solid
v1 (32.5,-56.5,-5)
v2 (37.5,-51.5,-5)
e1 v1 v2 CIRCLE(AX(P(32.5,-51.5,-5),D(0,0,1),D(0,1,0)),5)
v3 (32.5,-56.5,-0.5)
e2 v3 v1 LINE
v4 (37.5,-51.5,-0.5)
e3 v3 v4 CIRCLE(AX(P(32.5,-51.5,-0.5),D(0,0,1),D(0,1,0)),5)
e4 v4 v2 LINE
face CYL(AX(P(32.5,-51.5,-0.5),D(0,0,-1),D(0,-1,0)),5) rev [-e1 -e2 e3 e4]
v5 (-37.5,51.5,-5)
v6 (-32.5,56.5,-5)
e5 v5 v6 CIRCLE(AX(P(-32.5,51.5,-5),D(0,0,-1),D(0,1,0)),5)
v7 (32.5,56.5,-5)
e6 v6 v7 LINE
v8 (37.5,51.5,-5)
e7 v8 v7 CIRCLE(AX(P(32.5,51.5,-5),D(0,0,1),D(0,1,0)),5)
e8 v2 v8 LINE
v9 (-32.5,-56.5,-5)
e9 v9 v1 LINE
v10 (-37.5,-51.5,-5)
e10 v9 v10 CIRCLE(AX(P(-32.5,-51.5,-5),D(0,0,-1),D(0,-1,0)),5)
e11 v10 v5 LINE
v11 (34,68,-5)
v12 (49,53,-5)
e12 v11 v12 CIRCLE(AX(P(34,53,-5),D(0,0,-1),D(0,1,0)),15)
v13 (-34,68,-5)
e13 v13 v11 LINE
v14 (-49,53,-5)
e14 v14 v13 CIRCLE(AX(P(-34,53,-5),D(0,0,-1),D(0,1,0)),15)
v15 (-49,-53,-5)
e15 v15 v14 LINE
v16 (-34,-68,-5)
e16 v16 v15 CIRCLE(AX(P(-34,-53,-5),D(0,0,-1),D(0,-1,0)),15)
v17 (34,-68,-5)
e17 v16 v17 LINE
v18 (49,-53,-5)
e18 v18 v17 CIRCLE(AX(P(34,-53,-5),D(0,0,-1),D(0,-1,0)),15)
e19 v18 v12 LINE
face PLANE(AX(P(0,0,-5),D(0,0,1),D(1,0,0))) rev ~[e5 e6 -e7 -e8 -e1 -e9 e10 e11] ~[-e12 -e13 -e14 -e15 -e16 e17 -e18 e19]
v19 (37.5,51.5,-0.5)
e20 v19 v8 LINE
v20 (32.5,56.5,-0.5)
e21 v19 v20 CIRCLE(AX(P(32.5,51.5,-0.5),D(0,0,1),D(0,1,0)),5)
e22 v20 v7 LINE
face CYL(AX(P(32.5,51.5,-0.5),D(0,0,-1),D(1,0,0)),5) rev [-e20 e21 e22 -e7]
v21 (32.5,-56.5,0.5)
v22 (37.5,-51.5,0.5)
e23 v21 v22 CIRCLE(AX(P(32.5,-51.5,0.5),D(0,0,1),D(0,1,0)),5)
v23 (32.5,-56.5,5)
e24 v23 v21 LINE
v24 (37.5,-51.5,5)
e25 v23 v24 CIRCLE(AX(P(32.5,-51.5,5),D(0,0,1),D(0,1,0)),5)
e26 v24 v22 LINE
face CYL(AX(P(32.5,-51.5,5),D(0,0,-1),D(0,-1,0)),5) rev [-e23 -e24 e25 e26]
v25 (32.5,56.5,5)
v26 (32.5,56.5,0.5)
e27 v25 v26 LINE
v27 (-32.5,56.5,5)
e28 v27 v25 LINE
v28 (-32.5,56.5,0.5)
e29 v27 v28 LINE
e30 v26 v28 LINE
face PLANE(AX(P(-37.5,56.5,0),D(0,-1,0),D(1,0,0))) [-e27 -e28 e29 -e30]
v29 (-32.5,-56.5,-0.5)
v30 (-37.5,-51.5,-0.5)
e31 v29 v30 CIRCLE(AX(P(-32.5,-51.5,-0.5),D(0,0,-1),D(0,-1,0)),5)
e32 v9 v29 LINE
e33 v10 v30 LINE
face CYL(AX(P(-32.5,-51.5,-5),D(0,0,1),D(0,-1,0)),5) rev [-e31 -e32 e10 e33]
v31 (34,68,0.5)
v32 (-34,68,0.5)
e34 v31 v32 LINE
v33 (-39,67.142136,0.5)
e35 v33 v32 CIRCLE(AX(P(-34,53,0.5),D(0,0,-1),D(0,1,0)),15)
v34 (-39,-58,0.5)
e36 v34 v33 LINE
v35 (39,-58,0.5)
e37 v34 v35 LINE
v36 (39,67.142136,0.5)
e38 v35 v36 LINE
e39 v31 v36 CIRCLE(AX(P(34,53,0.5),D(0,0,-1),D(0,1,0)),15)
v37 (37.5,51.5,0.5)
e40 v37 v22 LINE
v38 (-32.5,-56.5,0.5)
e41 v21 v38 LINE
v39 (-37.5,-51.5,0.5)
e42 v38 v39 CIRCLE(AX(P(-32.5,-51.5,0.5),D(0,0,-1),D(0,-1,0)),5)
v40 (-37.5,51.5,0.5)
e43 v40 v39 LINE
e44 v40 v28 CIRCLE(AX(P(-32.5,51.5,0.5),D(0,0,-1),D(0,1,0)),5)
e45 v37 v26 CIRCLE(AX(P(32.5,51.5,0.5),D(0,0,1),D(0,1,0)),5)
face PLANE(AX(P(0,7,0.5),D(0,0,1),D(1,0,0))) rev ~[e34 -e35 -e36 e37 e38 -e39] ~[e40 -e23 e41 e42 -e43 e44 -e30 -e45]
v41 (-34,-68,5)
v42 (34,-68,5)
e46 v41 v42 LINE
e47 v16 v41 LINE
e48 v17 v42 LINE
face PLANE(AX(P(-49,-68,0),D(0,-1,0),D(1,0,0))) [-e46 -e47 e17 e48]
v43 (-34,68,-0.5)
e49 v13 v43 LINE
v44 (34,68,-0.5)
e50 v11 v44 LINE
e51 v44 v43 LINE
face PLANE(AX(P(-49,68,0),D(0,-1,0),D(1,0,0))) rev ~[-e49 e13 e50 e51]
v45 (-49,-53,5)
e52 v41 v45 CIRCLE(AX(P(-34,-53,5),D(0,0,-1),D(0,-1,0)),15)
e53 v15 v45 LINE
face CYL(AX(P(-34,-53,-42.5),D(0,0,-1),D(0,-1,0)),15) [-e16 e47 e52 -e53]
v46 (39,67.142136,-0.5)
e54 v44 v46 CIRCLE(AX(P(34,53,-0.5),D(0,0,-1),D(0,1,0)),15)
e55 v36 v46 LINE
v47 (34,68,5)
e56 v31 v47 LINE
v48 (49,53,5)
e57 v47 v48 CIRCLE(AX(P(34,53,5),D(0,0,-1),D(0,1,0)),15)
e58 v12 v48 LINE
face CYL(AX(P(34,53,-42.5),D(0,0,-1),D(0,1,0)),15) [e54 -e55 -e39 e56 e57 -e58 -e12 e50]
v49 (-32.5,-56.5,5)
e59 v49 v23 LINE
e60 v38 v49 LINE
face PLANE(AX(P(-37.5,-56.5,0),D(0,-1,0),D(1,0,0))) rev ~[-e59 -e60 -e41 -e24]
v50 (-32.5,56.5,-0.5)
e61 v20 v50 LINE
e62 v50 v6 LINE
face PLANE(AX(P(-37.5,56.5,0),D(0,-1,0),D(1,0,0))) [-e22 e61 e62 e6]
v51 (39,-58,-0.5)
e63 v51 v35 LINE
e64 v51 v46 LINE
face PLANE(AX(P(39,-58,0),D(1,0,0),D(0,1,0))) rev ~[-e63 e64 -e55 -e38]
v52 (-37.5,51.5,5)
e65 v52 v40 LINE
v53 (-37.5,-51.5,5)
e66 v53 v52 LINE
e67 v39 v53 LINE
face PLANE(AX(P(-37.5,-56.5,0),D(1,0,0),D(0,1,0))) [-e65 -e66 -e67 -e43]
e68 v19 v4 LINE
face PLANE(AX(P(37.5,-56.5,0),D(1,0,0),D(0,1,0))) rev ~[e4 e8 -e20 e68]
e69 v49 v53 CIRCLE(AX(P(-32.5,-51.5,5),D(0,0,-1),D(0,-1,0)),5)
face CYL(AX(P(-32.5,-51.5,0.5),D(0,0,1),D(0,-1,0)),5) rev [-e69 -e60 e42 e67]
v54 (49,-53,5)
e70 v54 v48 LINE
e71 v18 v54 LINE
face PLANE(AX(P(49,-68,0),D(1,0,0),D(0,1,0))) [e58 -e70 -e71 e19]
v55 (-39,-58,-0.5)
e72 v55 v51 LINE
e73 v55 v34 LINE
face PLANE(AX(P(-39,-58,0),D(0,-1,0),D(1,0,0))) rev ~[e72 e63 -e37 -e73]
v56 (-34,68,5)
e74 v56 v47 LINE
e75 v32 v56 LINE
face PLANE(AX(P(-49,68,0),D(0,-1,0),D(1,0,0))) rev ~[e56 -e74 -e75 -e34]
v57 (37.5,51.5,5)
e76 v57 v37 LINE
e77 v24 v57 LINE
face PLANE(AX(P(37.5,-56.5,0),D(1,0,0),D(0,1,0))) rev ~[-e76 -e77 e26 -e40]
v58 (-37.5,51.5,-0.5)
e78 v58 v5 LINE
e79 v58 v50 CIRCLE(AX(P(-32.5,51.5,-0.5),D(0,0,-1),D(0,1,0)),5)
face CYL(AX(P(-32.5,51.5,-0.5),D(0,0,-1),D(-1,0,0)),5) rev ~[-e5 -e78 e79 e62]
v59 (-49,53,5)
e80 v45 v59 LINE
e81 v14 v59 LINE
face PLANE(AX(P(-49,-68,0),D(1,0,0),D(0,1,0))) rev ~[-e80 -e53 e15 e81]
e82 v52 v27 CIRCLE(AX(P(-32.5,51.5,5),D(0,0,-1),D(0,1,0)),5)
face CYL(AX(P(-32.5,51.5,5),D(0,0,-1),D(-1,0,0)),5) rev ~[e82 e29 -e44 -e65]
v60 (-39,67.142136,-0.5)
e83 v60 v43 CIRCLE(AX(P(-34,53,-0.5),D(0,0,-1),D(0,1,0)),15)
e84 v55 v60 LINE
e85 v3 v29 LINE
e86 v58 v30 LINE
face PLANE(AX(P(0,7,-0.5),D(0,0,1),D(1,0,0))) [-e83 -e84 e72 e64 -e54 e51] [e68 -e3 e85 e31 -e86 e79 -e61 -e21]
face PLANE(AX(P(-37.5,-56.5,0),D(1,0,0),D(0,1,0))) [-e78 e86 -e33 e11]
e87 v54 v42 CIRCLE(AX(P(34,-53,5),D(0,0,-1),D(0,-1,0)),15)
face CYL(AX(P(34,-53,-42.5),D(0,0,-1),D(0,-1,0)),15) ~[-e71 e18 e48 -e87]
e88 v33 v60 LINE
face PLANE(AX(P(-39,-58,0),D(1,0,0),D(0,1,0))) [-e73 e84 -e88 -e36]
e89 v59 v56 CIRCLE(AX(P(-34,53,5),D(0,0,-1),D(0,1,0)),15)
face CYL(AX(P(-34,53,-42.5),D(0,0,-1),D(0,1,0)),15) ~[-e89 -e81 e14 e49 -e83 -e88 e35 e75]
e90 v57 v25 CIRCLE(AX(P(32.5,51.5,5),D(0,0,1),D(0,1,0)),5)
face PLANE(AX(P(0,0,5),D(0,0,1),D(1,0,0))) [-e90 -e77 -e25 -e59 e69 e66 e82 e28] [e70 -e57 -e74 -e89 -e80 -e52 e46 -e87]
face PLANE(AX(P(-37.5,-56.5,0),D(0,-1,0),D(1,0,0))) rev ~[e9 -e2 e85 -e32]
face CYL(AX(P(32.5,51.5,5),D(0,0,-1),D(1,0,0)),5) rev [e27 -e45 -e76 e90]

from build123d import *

# Parameters (mm, degrees)
F0_W        = 98
F0_H        = 136
F0_W_2      = 78
F0_H_2      = 116
F0_W_3      = 75
F0_H_3      = 113
F1_DEPTH    = 5
F2_W        = 78
F2_H        = 130
F3_DEPTH    = 0.5
F5_T1_DEPTH = 85
F6_R        = 5


# Not quite as in the source:
# - a fillet or chamfer that OpenCascade refuses, or shapes differently, is made with other operations: its cross-section is extruded or revolved along the edge and cut away or added
# - a feature of the source that left no trace in its solid (it failed there, or was rolled back) is left out


with BuildPart() as f1:
    # F0 (on Top) → F1 (new body, symmetric)
    with BuildSketch(Plane.XY):
        Rectangle(F0_W, F0_H)
        Rectangle(F0_W_2, F0_H_2, mode=Mode.SUBTRACT)
        Rectangle(F0_W_2, F0_H_2)
        Rectangle(F0_W_3, F0_H_3, mode=Mode.SUBTRACT)
    extrude(amount=F1_DEPTH, both=True)

    # F2 (on Top) → F3 (cut, symmetric)
    with BuildSketch(Plane.XY):
        with Locations((0, 7)):
            Rectangle(F2_W, F2_H)
    extrude(amount=F3_DEPTH, both=True, mode=Mode.SUBTRACT)

    # F5: fillet of radius 15 on 4 edges, made by hand

    # F5_s2 → F5_t1 (cut)
    with BuildSketch(Plane.XY.offset(-42.5)):
        with BuildLine():
            ThreePointArc((-34, -68), (-44.6066017178, -63.6066017178), (-49, -53))
            Line((-49, -53), (-49, -68))
            Line((-49, -68), (-34, -68))
        make_face()
        with BuildLine():
            ThreePointArc((34, -68), (44.6066017178, -63.6066017178), (49, -53))
            Line((49, -53), (49, -68))
            Line((49, -68), (34, -68))
        make_face()
        with BuildLine():
            ThreePointArc((34, 68), (44.6066017178, 63.6066017178), (49, 53))
            Line((49, 53), (49, 68))
            Line((49, 68), (34, 68))
        make_face()
        with BuildLine():
            ThreePointArc((-34, 68), (-44.6066017178, 63.6066017178), (-49, 53))
            Line((-49, 53), (-49, 68))
            Line((-49, 68), (-34, 68))
        make_face()
    extrude(amount=F5_T1_DEPTH, mode=Mode.SUBTRACT)

    # F6
    f6_edges = [f1.edges().sort_by_distance(p)[0] for p in [
        (37.5, -56.5, -2.75),
        (37.5, -56.5, 2.75),
        (-37.5, -56.5, 2.75),
        (-37.5, -56.5, -2.75),
        (-37.5, 56.5, 2.75),
        (-37.5, 56.5, -2.75),
        (37.5, 56.5, -2.75),
        (37.5, 56.5, 2.75),
    ]]
    fillet(f6_edges, radius=F6_R)


solid = f1.part
